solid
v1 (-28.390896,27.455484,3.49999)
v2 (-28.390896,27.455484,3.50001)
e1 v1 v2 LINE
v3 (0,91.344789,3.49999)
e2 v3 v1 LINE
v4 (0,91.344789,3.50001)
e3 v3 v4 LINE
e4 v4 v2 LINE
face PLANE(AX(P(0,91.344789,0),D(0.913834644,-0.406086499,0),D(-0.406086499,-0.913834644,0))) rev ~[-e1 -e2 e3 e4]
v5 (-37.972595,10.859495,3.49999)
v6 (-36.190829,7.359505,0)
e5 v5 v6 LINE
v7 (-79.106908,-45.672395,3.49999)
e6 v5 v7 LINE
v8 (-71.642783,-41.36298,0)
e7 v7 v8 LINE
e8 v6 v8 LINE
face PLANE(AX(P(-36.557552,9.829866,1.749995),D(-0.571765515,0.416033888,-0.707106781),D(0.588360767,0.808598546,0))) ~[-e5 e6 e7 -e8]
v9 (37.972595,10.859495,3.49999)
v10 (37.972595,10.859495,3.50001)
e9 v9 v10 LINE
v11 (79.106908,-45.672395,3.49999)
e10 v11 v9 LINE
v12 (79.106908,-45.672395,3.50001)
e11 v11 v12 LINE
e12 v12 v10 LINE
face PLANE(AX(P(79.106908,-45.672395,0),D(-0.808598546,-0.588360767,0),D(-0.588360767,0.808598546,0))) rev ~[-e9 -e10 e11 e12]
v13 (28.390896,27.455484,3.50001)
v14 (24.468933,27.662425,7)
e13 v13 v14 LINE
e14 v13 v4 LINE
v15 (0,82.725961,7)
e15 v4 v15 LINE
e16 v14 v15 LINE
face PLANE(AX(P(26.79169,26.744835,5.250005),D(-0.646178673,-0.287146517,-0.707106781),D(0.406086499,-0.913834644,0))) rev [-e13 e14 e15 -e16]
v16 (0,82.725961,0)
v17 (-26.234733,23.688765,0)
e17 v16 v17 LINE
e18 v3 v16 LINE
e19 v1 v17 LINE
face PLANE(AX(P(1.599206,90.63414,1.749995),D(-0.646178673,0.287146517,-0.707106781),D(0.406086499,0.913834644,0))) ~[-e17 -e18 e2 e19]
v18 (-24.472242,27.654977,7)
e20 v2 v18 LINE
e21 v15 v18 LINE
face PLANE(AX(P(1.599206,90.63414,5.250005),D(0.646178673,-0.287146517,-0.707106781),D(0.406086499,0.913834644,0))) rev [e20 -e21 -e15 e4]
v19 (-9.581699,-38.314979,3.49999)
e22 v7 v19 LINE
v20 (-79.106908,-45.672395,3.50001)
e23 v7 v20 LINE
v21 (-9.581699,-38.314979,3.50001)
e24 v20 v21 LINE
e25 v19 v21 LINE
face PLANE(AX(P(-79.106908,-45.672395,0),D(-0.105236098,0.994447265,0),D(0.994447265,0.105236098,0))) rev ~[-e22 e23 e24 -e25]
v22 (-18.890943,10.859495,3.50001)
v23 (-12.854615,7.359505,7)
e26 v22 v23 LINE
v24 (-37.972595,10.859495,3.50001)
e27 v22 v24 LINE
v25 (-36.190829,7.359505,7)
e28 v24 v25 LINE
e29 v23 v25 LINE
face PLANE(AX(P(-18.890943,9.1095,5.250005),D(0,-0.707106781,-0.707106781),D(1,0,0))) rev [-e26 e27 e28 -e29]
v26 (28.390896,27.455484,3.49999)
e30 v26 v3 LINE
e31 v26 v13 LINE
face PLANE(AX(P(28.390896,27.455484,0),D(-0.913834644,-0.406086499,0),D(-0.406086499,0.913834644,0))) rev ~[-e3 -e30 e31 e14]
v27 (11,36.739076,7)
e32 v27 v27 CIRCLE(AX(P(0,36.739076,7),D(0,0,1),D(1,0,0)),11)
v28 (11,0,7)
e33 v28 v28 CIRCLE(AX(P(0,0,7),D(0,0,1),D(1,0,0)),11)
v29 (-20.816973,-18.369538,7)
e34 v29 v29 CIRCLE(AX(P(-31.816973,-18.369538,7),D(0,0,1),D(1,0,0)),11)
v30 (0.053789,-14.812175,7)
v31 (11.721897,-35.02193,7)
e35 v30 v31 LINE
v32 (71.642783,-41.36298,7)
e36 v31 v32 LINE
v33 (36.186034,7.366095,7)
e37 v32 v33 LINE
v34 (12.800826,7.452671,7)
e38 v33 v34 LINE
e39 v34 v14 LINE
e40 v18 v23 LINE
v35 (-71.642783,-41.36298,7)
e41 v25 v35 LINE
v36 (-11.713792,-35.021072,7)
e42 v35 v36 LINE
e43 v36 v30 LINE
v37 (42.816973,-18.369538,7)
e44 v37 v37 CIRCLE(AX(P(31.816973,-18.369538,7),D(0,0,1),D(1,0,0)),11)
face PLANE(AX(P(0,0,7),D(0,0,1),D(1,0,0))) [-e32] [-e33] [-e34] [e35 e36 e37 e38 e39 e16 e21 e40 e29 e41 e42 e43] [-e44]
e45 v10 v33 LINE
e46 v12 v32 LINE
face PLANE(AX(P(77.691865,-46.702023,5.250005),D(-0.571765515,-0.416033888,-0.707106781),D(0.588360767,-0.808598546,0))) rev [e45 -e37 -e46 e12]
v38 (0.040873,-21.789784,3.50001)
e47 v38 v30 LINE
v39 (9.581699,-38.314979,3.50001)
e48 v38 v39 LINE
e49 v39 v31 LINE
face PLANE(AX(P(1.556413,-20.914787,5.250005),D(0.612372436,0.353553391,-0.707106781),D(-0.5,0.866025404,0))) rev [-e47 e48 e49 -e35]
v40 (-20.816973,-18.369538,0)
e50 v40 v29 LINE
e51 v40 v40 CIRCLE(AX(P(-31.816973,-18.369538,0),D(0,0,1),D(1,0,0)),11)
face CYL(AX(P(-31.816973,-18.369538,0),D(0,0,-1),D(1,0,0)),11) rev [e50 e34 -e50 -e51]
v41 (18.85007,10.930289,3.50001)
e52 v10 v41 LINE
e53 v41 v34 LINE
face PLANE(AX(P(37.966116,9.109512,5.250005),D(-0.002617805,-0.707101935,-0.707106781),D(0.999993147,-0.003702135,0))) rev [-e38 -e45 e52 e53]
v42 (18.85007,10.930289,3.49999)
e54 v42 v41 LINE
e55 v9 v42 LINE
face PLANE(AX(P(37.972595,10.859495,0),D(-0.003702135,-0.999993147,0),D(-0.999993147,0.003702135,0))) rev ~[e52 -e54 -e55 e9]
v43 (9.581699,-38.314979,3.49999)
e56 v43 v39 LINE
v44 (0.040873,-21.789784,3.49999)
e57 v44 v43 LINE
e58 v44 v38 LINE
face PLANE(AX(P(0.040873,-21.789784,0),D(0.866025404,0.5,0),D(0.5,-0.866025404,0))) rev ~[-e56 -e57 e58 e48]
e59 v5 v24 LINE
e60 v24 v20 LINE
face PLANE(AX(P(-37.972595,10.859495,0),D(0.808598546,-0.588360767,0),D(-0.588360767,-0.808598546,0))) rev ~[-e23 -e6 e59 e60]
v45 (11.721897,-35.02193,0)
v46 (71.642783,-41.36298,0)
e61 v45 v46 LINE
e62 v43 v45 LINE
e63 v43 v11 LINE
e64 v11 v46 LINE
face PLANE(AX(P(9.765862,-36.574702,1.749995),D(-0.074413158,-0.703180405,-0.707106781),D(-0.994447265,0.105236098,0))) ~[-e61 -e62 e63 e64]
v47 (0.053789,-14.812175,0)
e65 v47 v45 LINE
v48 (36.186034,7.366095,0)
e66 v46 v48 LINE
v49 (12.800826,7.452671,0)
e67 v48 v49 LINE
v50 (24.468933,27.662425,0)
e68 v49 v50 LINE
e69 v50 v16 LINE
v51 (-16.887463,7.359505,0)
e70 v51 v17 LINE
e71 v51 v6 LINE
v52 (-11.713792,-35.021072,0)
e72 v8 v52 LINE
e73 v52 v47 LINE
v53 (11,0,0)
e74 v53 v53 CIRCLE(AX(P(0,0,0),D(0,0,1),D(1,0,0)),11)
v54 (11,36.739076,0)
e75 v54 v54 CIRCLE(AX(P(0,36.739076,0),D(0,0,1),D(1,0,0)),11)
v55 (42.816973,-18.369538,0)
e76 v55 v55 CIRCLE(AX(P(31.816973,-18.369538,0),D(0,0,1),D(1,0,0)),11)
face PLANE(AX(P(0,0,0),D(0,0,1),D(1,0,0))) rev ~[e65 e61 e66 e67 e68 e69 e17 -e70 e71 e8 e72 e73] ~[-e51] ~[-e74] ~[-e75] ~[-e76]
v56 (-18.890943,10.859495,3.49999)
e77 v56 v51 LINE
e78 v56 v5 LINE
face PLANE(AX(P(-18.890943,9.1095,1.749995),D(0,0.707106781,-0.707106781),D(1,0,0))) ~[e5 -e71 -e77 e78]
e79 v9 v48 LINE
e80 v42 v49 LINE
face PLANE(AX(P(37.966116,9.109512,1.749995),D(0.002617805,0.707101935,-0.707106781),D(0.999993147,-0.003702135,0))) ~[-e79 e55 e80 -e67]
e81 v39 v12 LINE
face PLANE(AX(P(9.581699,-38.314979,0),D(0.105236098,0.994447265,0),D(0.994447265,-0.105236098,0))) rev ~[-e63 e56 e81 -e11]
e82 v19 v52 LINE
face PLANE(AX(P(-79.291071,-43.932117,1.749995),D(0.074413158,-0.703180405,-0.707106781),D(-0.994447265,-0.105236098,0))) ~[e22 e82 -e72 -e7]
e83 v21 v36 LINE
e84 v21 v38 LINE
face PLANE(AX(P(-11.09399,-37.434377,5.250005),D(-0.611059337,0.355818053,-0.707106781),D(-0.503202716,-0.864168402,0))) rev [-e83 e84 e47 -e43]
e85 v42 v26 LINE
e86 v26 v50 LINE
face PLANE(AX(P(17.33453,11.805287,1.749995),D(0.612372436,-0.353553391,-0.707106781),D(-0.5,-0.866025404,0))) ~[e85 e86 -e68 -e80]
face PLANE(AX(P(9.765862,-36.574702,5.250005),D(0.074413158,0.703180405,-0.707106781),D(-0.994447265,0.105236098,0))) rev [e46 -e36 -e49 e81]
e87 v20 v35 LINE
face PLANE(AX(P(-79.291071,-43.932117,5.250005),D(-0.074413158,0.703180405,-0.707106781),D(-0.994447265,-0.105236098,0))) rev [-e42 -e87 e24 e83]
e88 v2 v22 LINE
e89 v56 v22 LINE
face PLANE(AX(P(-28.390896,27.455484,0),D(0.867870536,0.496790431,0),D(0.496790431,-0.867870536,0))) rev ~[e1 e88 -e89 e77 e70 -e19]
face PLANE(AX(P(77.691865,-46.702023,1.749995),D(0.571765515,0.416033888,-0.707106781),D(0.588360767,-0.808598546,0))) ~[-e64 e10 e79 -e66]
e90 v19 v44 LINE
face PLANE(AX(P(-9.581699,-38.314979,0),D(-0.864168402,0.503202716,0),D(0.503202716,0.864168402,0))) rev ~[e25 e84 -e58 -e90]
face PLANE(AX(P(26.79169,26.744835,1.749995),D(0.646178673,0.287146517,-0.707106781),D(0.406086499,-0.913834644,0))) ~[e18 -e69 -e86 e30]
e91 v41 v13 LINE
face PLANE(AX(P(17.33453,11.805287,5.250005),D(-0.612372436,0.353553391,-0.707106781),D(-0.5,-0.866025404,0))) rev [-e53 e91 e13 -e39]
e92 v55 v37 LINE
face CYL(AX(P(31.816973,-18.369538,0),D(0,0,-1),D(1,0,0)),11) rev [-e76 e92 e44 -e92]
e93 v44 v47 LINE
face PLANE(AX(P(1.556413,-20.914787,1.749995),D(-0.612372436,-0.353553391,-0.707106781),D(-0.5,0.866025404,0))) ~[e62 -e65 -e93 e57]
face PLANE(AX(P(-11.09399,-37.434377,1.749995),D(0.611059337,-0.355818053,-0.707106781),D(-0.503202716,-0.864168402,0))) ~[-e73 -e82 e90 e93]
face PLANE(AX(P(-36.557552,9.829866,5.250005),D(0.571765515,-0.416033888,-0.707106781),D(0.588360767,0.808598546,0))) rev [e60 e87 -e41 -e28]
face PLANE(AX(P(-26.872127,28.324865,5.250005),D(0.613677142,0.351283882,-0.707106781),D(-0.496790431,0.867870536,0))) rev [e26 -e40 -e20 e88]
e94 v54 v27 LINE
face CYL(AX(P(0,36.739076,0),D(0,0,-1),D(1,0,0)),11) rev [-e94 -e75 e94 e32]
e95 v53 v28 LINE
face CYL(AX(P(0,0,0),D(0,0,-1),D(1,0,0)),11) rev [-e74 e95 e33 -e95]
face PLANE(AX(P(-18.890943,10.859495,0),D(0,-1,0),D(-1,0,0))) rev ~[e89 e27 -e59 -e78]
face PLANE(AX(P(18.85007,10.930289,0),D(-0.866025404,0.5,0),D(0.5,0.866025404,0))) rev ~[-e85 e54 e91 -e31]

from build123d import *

# Parameters (mm, degrees)
F0_R     = 11
F1_DEPTH = 7
F2_SIZE  = 3.49999


# Not quite as in the source:
# - a fillet or chamfer is up to 0.001 mm smaller than in the source, because OpenCascade refuses the exact size


with BuildPart() as f1:
    # F0 (on Top) → F1 (new body)
    with BuildSketch(Plane.XY):
        Polygon((28.3908957982, 27.4554844946), (0, 91.3447894481), (-28.3908957982, 27.4554844946), (-18.890943275, 10.8594947502), (-37.9725949446, 10.8594947502), (-79.1069081654, -45.6723947241), (-9.5816991464, -38.3149792447), (0.0408733116, -21.7897841527), (9.5816991464, -38.3149792447), (79.1069081654, -45.6723947241), (37.9725949446, 10.8594947502), (18.8500699634, 10.9302894025), align=None)
        with Locations((-31.8169734902, -18.3695382094)):
            Circle(F0_R, mode=Mode.SUBTRACT)
        with Locations((31.8169734902, -18.3695382094)):
            Circle(F0_R, mode=Mode.SUBTRACT)
        Circle(F0_R, mode=Mode.SUBTRACT)
        with Locations((0, 36.7390764187)):
            Circle(F0_R, mode=Mode.SUBTRACT)
    extrude(amount=F1_DEPTH)

    # F2 (size 3.5 in the source; OpenCascade refuses exactly that, so slightly less here)
    f2_edges = [f1.edges().sort_by_distance(p)[0] for p in [
        (-44.344304, -41.993687, 7),
        (-4.770413, -30.052382, 0),
        (-44.344304, -41.993687, 0),
        (-4.770413, -30.052382, 7),
        (4.811286, -30.052382, 7),
        (4.811286, -30.052382, 0),
        (44.344304, -41.993687, 7),
        (44.344304, -41.993687, 0),
        (-58.539752, -17.40645, 7),
        (58.539752, -17.40645, 7),
        (-14.195448, 59.400137, 7),
        (14.195448, 59.400137, 7),
        (-28.431769, 10.859495, 7),
        (-23.64092, 19.15749, 7),
        (23.620483, 19.192887, 0),
        (28.411332, 10.894892, 7),
        (23.620483, 19.192887, 7),
        (-28.431769, 10.859495, 0),
        (-58.539752, -17.40645, 0),
        (-14.195448, 59.400137, 0),
        (14.195448, 59.400137, 0),
        (58.539752, -17.40645, 0),
        (28.411332, 10.894892, 0),
    ]]
    chamfer(f2_edges, length=F2_SIZE)


solid = f1.part
